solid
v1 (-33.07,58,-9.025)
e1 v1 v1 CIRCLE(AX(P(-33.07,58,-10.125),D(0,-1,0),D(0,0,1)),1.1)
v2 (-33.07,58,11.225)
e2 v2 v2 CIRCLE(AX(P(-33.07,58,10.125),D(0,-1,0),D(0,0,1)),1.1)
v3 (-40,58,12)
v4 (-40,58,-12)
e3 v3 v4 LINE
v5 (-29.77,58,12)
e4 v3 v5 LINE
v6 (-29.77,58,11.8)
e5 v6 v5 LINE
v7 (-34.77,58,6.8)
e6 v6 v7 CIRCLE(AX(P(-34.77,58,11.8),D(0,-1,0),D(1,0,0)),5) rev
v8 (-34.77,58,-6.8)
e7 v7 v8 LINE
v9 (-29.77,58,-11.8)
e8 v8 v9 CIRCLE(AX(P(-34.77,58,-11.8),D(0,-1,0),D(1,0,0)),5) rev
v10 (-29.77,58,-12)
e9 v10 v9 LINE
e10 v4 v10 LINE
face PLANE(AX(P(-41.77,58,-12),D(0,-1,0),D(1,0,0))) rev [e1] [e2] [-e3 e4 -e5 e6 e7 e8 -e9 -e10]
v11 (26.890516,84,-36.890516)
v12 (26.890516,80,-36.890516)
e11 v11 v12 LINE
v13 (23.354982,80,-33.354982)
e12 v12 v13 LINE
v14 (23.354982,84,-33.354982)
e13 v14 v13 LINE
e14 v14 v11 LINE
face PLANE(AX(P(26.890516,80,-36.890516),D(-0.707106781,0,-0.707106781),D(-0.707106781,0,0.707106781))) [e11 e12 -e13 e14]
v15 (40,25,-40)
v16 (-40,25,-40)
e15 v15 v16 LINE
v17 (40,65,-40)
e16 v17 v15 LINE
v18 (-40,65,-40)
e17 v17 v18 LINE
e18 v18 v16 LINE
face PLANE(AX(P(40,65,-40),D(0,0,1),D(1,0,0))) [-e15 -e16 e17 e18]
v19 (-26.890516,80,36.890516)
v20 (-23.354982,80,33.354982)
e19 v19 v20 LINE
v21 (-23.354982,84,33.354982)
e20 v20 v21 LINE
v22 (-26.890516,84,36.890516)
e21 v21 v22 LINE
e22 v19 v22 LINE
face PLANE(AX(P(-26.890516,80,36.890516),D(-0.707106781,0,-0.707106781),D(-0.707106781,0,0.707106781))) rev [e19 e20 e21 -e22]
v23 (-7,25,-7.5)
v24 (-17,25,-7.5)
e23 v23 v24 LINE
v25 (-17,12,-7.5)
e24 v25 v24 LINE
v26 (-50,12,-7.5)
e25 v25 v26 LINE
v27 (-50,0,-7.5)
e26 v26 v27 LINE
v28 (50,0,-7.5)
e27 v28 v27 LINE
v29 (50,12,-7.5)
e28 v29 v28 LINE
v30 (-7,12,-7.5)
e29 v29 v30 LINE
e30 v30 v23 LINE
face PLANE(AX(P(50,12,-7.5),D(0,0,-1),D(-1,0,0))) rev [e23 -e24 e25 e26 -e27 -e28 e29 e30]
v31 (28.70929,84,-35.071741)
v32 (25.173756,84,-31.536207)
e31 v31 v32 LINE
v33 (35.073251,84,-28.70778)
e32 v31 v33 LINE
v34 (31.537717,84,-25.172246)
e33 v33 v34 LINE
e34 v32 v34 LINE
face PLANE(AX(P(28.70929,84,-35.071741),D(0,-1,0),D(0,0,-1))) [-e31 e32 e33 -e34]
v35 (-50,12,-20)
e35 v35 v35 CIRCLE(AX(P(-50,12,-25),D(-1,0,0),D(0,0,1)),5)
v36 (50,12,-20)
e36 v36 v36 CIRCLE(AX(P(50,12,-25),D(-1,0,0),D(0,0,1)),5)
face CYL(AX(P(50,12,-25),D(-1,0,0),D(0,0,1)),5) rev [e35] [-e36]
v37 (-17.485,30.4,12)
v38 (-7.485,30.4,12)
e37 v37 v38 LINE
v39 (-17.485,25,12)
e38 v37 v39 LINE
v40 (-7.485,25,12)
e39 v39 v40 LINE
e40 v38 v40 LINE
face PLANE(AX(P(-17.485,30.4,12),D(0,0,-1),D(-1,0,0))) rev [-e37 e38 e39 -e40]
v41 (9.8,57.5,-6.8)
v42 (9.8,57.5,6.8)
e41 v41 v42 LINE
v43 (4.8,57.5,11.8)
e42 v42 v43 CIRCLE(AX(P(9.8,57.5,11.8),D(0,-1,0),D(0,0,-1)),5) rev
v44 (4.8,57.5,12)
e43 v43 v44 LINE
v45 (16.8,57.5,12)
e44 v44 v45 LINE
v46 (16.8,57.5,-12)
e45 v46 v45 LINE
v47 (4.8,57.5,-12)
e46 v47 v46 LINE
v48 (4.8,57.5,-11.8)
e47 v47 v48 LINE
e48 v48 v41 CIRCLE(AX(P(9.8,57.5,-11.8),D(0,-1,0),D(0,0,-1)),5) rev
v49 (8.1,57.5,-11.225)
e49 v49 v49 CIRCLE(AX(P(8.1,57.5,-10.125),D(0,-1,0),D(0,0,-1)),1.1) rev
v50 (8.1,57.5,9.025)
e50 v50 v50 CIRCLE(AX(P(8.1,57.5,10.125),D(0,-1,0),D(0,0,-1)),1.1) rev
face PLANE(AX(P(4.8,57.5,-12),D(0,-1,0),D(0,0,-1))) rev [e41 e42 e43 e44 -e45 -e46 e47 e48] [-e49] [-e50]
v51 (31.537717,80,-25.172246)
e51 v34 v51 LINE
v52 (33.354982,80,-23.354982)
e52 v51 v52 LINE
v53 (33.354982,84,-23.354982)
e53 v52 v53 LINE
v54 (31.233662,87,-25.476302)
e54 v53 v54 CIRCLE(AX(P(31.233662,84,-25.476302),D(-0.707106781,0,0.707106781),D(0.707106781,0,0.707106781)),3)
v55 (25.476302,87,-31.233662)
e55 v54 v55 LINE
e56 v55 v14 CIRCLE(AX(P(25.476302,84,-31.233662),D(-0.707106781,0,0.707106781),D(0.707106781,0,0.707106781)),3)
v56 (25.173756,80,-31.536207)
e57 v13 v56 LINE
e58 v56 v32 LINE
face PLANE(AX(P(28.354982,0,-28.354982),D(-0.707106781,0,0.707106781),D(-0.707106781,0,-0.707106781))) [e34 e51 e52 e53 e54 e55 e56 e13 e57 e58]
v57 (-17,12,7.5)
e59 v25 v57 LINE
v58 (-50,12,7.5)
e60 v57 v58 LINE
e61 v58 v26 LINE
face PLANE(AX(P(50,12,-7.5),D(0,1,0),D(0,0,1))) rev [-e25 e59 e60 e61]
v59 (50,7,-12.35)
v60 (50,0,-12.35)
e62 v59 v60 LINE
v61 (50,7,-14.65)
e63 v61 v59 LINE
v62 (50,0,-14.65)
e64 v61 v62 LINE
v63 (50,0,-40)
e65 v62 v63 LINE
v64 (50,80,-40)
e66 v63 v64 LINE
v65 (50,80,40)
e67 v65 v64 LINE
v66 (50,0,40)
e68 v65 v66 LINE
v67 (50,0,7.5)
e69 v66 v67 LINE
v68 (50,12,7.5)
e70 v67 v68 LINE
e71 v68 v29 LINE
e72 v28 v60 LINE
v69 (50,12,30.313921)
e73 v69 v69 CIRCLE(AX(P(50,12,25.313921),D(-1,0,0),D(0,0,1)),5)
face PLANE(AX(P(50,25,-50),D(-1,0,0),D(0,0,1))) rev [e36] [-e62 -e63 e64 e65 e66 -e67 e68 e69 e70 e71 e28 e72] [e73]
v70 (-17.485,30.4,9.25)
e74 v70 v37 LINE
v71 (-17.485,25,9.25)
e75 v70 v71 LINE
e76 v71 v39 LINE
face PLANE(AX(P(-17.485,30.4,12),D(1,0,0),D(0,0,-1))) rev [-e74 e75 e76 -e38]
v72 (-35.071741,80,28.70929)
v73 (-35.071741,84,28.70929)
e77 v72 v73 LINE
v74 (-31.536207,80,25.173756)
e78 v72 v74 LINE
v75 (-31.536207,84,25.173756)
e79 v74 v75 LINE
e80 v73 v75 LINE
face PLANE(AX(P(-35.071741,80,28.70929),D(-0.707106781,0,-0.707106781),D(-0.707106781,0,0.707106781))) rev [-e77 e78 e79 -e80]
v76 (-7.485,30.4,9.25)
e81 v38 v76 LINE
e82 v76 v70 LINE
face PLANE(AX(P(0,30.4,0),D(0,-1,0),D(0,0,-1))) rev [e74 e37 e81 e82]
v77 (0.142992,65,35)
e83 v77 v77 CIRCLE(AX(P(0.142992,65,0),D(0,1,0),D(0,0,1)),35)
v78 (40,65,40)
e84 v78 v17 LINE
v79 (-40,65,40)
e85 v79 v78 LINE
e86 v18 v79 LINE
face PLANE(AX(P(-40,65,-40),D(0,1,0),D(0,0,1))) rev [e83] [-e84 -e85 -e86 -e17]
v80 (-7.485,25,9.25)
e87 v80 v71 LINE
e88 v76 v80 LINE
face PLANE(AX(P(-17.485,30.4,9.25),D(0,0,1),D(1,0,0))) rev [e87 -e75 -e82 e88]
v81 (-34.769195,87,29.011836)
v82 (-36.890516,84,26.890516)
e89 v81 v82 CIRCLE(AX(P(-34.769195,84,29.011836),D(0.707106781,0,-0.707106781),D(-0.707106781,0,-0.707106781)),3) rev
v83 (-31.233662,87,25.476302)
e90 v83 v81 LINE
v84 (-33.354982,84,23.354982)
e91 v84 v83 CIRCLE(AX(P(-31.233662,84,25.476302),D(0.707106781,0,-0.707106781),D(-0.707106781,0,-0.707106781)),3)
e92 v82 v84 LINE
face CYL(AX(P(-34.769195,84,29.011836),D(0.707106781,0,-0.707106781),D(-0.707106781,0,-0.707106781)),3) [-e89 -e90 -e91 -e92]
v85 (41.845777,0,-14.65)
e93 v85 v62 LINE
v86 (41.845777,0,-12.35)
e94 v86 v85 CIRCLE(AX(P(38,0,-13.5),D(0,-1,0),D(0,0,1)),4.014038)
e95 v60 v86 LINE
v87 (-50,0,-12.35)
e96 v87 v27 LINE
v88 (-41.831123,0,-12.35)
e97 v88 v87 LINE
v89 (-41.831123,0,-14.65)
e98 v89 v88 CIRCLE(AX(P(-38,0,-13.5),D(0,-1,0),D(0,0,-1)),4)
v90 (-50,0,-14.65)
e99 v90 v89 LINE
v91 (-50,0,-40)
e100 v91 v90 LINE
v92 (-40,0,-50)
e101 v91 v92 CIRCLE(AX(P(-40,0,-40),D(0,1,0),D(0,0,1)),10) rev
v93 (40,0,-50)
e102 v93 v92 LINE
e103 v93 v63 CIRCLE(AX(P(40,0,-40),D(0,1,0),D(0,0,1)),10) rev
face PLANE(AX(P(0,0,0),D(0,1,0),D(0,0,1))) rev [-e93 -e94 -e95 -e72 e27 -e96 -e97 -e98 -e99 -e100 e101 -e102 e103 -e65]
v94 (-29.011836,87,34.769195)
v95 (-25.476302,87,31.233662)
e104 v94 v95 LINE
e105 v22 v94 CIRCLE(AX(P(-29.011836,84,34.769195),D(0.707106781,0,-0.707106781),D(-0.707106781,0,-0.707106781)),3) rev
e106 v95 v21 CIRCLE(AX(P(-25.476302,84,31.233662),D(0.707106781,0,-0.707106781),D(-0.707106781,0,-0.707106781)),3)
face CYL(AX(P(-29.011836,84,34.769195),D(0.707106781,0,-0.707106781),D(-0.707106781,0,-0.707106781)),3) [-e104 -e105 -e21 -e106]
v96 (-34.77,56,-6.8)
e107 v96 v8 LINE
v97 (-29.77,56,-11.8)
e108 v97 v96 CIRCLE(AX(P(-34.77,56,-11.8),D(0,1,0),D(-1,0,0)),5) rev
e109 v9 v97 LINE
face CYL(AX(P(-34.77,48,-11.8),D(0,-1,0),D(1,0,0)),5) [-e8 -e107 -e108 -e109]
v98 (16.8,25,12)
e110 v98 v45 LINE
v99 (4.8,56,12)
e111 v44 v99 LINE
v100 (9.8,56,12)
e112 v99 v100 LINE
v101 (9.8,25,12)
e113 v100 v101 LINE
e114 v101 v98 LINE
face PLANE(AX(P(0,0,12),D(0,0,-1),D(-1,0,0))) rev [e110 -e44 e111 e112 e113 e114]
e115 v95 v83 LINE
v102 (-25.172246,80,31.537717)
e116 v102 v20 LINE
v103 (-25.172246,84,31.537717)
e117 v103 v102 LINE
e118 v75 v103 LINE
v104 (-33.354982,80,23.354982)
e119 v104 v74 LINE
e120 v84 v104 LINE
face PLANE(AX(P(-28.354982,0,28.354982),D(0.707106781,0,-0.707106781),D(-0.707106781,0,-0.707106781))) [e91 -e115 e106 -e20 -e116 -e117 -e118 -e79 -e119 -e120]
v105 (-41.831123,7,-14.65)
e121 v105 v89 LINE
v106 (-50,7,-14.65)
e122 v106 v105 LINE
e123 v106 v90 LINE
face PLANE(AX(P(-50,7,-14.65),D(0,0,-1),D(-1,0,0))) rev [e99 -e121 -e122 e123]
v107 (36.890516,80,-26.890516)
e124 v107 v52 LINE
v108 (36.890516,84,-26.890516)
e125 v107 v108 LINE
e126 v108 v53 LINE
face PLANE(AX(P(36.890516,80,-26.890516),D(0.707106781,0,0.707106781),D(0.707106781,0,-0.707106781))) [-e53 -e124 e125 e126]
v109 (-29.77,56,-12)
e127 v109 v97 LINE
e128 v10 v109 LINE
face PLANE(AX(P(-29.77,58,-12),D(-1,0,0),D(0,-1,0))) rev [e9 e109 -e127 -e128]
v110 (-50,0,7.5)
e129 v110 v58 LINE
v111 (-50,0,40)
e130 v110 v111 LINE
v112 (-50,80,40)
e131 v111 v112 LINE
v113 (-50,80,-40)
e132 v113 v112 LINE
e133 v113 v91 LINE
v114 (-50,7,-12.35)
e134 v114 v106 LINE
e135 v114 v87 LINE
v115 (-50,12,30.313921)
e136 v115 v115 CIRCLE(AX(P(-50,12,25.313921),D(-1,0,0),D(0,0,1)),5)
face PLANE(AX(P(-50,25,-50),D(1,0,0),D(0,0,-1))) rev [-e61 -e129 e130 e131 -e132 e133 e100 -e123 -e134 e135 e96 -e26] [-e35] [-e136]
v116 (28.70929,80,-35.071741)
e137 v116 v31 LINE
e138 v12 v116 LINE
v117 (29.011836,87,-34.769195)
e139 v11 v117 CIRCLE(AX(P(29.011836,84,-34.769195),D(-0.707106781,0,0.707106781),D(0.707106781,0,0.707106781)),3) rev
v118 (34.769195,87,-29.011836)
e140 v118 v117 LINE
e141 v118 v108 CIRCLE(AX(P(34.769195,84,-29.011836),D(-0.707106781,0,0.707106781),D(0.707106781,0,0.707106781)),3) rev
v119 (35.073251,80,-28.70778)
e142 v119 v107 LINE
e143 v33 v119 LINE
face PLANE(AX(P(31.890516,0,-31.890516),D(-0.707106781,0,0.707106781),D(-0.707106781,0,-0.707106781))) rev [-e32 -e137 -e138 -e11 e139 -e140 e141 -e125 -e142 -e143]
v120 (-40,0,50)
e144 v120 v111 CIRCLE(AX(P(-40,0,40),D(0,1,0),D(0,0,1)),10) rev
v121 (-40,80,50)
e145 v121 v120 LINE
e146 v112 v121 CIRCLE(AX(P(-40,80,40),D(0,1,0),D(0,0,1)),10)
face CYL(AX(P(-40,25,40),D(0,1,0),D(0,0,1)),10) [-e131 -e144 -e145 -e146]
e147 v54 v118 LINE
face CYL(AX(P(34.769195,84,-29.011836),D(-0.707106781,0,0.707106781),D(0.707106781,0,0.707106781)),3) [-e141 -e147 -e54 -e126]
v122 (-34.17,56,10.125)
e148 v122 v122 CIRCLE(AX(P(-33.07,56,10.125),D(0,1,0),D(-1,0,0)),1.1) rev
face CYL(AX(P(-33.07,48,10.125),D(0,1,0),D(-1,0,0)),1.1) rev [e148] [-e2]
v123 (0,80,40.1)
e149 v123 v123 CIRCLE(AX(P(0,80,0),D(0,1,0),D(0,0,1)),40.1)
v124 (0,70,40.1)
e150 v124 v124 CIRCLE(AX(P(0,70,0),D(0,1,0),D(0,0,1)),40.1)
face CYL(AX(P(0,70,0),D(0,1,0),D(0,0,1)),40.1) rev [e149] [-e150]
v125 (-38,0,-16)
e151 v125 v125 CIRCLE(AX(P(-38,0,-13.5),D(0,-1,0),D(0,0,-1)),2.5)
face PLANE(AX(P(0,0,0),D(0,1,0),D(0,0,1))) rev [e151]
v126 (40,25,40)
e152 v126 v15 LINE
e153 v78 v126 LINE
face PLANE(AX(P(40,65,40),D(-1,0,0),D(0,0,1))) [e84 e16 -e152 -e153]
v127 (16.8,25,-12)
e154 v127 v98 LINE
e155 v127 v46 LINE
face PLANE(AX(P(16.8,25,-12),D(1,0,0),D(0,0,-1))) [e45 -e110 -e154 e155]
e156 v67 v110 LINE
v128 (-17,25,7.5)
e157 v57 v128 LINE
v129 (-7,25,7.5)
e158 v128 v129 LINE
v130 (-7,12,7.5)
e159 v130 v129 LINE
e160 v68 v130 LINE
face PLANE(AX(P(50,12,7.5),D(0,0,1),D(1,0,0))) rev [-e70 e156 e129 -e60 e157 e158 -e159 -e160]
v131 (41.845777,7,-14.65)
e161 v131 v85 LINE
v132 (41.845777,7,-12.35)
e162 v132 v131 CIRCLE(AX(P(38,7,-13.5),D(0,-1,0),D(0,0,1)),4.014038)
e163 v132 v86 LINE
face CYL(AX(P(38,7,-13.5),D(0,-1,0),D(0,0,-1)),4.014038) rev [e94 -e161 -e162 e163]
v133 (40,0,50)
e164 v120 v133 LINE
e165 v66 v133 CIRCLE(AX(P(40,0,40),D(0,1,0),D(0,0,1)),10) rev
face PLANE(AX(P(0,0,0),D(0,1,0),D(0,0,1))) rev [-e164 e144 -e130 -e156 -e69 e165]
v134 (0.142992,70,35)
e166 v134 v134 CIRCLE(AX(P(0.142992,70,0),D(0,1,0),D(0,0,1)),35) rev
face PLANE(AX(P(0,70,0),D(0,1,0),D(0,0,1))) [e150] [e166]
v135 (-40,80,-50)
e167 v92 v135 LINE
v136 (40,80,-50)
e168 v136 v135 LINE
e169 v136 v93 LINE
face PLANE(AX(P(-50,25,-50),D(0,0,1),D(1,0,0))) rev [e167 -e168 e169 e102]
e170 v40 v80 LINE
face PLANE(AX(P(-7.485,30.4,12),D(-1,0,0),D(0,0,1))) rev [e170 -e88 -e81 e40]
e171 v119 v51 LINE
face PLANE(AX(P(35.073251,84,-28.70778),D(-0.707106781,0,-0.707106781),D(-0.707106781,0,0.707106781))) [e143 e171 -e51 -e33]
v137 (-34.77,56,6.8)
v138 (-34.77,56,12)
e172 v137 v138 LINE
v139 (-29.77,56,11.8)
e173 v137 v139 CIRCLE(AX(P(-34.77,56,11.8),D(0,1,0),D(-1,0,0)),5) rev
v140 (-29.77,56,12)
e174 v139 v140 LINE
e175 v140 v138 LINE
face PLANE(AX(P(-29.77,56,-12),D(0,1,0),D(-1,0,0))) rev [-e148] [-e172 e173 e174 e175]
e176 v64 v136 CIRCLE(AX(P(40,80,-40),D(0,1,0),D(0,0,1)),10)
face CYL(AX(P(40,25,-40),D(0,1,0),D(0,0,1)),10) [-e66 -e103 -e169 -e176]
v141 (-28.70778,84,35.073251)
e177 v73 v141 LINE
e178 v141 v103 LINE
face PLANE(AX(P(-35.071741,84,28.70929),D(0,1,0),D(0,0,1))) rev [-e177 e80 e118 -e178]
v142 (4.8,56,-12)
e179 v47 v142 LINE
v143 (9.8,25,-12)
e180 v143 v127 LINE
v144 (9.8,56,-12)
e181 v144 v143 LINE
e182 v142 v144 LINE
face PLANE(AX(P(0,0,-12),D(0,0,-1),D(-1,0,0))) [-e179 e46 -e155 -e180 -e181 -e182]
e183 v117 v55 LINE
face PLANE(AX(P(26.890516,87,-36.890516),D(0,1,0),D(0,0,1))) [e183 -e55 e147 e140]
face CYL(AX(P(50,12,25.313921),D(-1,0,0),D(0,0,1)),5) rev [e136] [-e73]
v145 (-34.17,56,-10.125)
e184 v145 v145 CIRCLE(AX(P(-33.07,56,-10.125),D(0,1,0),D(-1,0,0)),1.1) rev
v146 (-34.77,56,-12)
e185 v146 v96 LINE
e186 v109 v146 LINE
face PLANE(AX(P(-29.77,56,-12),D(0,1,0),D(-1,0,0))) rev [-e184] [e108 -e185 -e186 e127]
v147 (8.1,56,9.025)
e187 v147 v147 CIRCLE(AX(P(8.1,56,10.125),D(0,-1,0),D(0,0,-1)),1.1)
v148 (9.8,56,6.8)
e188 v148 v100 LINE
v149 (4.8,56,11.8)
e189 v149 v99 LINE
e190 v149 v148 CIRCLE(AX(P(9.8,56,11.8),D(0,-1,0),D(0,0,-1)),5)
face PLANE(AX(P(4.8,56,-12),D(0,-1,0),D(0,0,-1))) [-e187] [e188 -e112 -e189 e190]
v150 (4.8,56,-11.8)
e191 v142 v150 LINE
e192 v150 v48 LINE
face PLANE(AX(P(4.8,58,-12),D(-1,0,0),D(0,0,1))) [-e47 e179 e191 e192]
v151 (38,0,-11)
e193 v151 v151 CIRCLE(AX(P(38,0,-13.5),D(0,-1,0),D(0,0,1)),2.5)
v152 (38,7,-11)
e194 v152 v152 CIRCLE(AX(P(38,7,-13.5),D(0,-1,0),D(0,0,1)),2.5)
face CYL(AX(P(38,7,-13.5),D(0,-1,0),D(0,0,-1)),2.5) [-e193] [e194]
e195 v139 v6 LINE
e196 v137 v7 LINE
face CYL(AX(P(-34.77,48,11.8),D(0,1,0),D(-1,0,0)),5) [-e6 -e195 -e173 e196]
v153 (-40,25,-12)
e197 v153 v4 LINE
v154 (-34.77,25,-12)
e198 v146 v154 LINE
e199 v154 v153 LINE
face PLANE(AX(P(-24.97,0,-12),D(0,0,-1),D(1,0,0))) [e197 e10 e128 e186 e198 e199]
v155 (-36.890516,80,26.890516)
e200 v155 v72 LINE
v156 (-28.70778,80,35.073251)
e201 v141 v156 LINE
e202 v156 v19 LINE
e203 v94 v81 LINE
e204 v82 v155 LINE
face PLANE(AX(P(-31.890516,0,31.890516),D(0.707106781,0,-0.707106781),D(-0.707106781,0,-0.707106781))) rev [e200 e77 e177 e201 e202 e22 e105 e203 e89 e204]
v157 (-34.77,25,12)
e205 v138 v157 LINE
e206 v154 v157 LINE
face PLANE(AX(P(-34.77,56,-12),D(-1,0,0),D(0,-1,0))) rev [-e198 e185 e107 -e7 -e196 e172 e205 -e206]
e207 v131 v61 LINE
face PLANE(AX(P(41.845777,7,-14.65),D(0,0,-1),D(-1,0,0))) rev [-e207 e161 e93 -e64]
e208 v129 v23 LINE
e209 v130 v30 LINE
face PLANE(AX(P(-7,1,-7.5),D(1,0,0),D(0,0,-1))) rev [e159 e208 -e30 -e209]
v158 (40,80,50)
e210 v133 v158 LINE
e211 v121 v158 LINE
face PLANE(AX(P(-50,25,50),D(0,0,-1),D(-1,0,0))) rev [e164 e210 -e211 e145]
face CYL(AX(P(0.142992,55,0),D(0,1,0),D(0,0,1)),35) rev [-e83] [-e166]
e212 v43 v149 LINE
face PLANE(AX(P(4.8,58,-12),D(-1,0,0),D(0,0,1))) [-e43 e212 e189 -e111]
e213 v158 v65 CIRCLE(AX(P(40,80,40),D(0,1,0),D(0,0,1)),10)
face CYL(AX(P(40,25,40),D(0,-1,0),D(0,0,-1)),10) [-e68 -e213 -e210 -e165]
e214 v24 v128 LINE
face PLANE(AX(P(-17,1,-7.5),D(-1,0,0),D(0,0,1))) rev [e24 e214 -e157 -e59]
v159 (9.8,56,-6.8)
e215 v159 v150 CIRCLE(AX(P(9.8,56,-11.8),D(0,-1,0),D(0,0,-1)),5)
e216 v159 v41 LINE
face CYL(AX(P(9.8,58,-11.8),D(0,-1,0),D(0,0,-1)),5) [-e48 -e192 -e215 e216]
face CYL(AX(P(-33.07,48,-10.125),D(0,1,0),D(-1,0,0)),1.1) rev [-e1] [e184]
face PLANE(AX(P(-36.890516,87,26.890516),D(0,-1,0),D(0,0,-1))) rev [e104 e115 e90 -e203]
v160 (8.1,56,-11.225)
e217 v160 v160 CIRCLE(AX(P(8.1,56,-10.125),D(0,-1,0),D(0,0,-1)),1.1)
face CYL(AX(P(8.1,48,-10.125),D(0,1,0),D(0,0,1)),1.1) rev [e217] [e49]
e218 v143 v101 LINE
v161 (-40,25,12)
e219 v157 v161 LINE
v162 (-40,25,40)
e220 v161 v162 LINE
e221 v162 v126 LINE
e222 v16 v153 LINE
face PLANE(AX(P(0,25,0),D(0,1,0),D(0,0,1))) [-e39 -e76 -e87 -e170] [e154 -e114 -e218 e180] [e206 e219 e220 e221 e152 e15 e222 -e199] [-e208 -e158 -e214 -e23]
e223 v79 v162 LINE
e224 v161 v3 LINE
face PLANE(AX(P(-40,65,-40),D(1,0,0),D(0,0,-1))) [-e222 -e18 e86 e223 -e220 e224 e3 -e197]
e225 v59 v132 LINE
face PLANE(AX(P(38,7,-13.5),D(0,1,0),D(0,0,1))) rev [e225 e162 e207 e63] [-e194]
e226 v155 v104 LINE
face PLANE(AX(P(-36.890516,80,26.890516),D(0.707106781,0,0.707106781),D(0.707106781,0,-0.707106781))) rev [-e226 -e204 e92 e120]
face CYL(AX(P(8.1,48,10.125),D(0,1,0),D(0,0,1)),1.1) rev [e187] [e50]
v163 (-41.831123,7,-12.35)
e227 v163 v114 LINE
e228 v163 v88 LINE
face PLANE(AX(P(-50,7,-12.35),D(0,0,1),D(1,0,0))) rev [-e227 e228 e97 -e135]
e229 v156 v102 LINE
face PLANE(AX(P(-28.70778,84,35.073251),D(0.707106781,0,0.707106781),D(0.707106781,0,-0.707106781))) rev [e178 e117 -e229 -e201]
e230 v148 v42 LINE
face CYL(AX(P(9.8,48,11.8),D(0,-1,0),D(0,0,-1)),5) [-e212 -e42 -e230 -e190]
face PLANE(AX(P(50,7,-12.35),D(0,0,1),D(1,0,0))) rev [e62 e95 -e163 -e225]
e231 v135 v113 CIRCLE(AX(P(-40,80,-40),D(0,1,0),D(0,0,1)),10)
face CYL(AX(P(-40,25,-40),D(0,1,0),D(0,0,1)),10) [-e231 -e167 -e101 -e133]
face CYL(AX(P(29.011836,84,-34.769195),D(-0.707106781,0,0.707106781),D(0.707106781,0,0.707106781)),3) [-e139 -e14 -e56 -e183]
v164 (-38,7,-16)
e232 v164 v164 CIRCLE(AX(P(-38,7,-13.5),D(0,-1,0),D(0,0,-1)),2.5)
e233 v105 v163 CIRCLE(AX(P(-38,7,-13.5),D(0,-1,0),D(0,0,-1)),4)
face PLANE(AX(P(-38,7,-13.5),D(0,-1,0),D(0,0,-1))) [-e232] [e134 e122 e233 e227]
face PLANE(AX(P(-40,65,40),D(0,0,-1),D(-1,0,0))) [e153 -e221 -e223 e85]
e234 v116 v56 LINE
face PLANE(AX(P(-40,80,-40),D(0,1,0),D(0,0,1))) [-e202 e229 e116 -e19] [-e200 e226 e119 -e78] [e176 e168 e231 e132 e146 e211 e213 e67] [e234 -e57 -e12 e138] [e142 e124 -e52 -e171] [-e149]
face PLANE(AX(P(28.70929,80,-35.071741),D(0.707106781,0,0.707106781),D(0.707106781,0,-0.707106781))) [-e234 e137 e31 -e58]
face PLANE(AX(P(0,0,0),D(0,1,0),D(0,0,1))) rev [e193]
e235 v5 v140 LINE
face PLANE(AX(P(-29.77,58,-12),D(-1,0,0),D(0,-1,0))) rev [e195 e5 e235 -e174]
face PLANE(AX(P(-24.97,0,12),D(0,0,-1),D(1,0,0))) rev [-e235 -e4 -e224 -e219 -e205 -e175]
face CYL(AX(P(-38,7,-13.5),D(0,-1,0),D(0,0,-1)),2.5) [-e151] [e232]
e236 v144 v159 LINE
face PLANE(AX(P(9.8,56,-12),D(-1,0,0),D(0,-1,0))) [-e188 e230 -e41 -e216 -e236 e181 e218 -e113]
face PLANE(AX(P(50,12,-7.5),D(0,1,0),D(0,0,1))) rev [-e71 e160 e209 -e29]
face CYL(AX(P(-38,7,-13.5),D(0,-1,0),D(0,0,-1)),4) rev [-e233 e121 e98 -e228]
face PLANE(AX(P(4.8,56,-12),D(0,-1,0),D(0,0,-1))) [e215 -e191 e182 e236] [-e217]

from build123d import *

# Parameters (mm, degrees)
SKETCH1_W            = 100
SKETCH1_H            = 100
BOSS_EXTRUDE1_DEPTH  = 25
SKETCH2_W            = 100
SKETCH2_H            = 100
SKETCH2_W_2          = 80
SKETCH2_H_2          = 80
BOSS_EXTRUDE2_DEPTH  = 40
SKETCH3_R            = 5
SKETCH3_W            = 15
SKETCH3_H            = 12
CUT_EXTRUDE1_DEPTH   = 130.325171564
FILLET2_R            = 10
FILLET3_R            = 10
FILLET4_R            = 10
FILLET5_R            = 10
BOSS_EXTRUDE3_DEPTH  = 15
SKETCH6_R            = 35
CUT_EXTRUDE3_DEPTH   = 25
SKETCH7_R            = 40.1
CUT_EXTRUDE4_DEPTH   = 10
BOSS_EXTRUDE4_DEPTH  = 12
SKETCH10_R           = 1.1
SKETCH10_W           = 5
SKETCH10_H           = 13.6
CUT_EXTRUDE5_DEPTH   = 10
FILLET6_R            = 5
SKETCH11_W           = 12
SKETCH11_H           = 0.5
CUT_EXTRUDE6_DEPTH   = 24
SKETCH12_W           = 10
SKETCH12_H           = 15
CUT_EXTRUDE7_DEPTH   = 24
SKETCH15_W           = 10
SKETCH15_H           = 2.75
BOSS_EXTRUDE5_DEPTH  = 5.4
SKETCH18_R           = 2.5
CUT_EXTRUDE8_DEPTH   = 7
BOSS_EXTRUDE6_DEPTH  = 5
FILLET8_R            = 3
FILLET8_OF_MIRROR3_R = 3


with BuildPart() as part:
    # Sketch1 → Boss-Extrude1 (new body)
    with BuildSketch(Plane(origin=(0, 0, 0), x_dir=(1, 0, 0), z_dir=(0, 1, 0))):
        Rectangle(SKETCH1_W, SKETCH1_H)
    extrude(amount=BOSS_EXTRUDE1_DEPTH)

    # Sketch2 → Boss-Extrude2 (add)
    with BuildSketch(Plane(origin=(0, 25, 0), x_dir=(1, 0, 0), z_dir=(0, 1, 0))):
        Rectangle(SKETCH2_W, SKETCH2_H)
        Rectangle(SKETCH2_W_2, SKETCH2_H_2, mode=Mode.SUBTRACT)
    extrude(amount=BOSS_EXTRUDE2_DEPTH)

    # Sketch3 → Cut-Extrude1 (cut, through all)
    with BuildSketch(Plane.ZY.offset(50)):
        with Locations((-25, 12)):
            Circle(SKETCH3_R)
        with Locations((25.313920598, 12)):
            Circle(SKETCH3_R)
        with Locations((0, 6)):
            Rectangle(SKETCH3_W, SKETCH3_H)
    extrude(amount=-CUT_EXTRUDE1_DEPTH, mode=Mode.SUBTRACT)

    # Fillet2
    fillet2_edges = [part.edges().sort_by_distance(p)[0] for p in [
        (50, 32.5, 50),
    ]]
    fillet(fillet2_edges, radius=FILLET2_R)

    # Fillet3
    fillet3_edges = [part.edges().sort_by_distance(p)[0] for p in [
        (50, 32.5, -50),
    ]]
    fillet(fillet3_edges, radius=FILLET3_R)

    # Fillet4
    fillet4_edges = [part.edges().sort_by_distance(p)[0] for p in [
        (-50, 32.5, -50),
    ]]
    fillet(fillet4_edges, radius=FILLET4_R)

    # Fillet5
    fillet5_edges = [part.edges().sort_by_distance(p)[0] for p in [
        (-50, 32.5, 50),
    ]]
    fillet(fillet5_edges, radius=FILLET5_R)

    # Sketch5 → Boss-Extrude3 (add)
    with BuildSketch(Plane(origin=(0, 65, 0), x_dir=(1, 0, 0), z_dir=(0, 1, 0))):
        with BuildLine():
            Line((-50, 40), (-50, -40))
            ThreePointArc((-50, -40), (-47.071067812, -47.071067812), (-40, -50))
            Line((-40, -50), (40, -50))
            ThreePointArc((40, -50), (47.071067812, -47.071067812), (50, -40))
            Line((50, -40), (50, 40))
            ThreePointArc((50, 40), (47.071067812, 47.071067812), (40, 50))
            Line((40, 50), (-40, 50))
            ThreePointArc((-40, 50), (-47.071067812, 47.071067812), (-50, 40))
        make_face()
    extrude(amount=BOSS_EXTRUDE3_DEPTH)

    # Sketch6 → Cut-Extrude3 (cut)
    with BuildSketch(Plane(origin=(0, 80, 0), x_dir=(1, 0, 0), z_dir=(0, 1, 0))):
        with Locations(Location((0.142992369, 0, 0), (0, 0, 270))):
            Circle(SKETCH6_R)
    extrude(amount=-CUT_EXTRUDE3_DEPTH, mode=Mode.SUBTRACT)

    # Sketch7 → Cut-Extrude4 (cut)
    with BuildSketch(Plane(origin=(0, 80, 0), x_dir=(1, 0, 0), z_dir=(0, 1, 0))):
        with Locations(Location((0, 0, 0), (0, 0, 270))):
            Circle(SKETCH7_R)
    extrude(amount=-CUT_EXTRUDE4_DEPTH, mode=Mode.SUBTRACT)

    # Sketch9 → Boss-Extrude4 (add, symmetric)
    with BuildSketch(Plane.XY):
        Polygon((9.8, 56), (9.8, 25), (16.8, 25), (16.8, 58), (4.8, 58), (4.8, 56), align=None)
    boss_extrude4 = extrude(amount=BOSS_EXTRUDE4_DEPTH, both=True)

    # Mirror1: Boss-Extrude4 across plane
    add(boss_extrude4.mirror(Plane.ZY.offset(12.485)))

    # Sketch10 → Cut-Extrude5 (cut)
    with BuildSketch(Plane(origin=(0, 58, 0), x_dir=(1, 0, 0), z_dir=(0, 1, 0))):
        with Locations(Location((8.1, -10.125, 0), (0, 0, 270))):
            Circle(SKETCH10_R)
        with Locations(Location((8.1, 10.125, 0), (0, 0, 270))):
            Circle(SKETCH10_R)
        with Locations((7.3, 0)):
            Rectangle(SKETCH10_W, SKETCH10_H)
    cut_extrude5 = extrude(amount=-CUT_EXTRUDE5_DEPTH, mode=Mode.SUBTRACT)

    # Mirror2: Cut-Extrude5 across plane
    add(cut_extrude5.mirror(Plane.ZY.offset(12.485)), mode=Mode.SUBTRACT)

    # Fillet6
    fillet6_edges = [part.edges().sort_by_distance(p)[0] for p in [
        (-29.77, 57, 6.8),
        (-29.77, 57, -6.8),
        (4.8, 57, 6.8),
        (4.8, 57, -6.8),
    ]]
    fillet(fillet6_edges, radius=FILLET6_R - 0.0001)  # a hair under: the kernel refuses the full size

    # Sketch11 → Cut-Extrude6 (cut)
    with BuildSketch(Plane.XY.offset(12)):
        with Locations((10.8, 57.75)):
            Rectangle(SKETCH11_W, SKETCH11_H)
    extrude(amount=-CUT_EXTRUDE6_DEPTH, mode=Mode.SUBTRACT)

    # Sketch12 → Cut-Extrude7 (cut)
    with BuildSketch(Plane(origin=(0, 25, 0), x_dir=(1, 0, 0), z_dir=(0, 1, 0))):
        with Locations((-12, 0)):
            Rectangle(SKETCH12_W, SKETCH12_H)
    extrude(amount=-CUT_EXTRUDE7_DEPTH, mode=Mode.SUBTRACT)

    # Sketch15 → Boss-Extrude5 (add)
    with BuildSketch(Plane(origin=(0, 25, 0), x_dir=(1, 0, 0), z_dir=(0, 1, 0))):
        with Locations((-12.485, -10.625)):
            Rectangle(SKETCH15_W, SKETCH15_H)
    extrude(amount=BOSS_EXTRUDE5_DEPTH)

    # Sketch18 → Cut-Extrude8 (cut)
    # profile 1 of 2: a face of its own
    with BuildSketch(Plane.XZ):
        with BuildLine():
            Line((-50, -12.35), (-50, -14.65))
            Line((-50, -14.65), (-41.831122551, -14.65))
            ThreePointArc((-41.831122551, -14.65), (-34, -13.5), (-41.831122551, -12.35))
            Line((-41.831122551, -12.35), (-50, -12.35))
        make_face()
        with Locations(Location((-38, -13.5, 0), (0, 0, 270))):
            Circle(SKETCH18_R, mode=Mode.SUBTRACT)
    # profile 2 of 2: a face of its own
    with BuildSketch(Plane.XZ):
        with BuildLine():
            Line((41.845776905, -14.65), (50, -14.65))
            Line((50, -14.65), (50, -12.35))
            Line((50, -12.35), (41.845776905, -12.35))
            ThreePointArc((41.845776905, -12.35), (33.985962133, -13.5), (41.845776905, -14.65))
        make_face()
        with Locations(Location((38, -13.5, 0), (0, 0, 90))):
            Circle(SKETCH18_R, mode=Mode.SUBTRACT)
    extrude(amount=-CUT_EXTRUDE8_DEPTH, mode=Mode.SUBTRACT)

    # Sketch20 → Boss-Extrude6 (add)
    with BuildSketch(Plane(origin=(-28.354981926, 0, 28.354981926), x_dir=(0.7071067811865476, 0, 0.7071067811865475), z_dir=(-0.7071067811865475, 0, 0.7071067811865476))):
        Polygon((-4.498932188, 80), (-4.498932188, 84), (4.501067812, 84), (4.501067812, 80), (7.071067812, 80), (7.071067812, 87), (-7.071067812, 87), (-7.071067812, 80), align=None)
    boss_extrude6 = extrude(amount=BOSS_EXTRUDE6_DEPTH)

    # Fillet8
    fillet8_edges = [part.edges().sort_by_distance(p)[0] for p in [
        (-35.122748879, 87, 25.122748879),
        (-25.122748879, 87, 35.122748879),
    ]]
    fillet(fillet8_edges, radius=FILLET8_R)

    # Mirror3: Boss-Extrude6 across plane
    add(boss_extrude6.mirror(Plane(origin=(0, 0, 0), x_dir=(0.7071067811865476, 0, 0.7071067811865475), z_dir=(-0.7071067811865475, 0, 0.7071067811865476))))

    # Fillet8 of Mirror3
    fillet8_of_mirror3_edges = [part.edges().sort_by_distance(p)[0] for p in [
        (25.122748879, 87, -35.122748879),
        (35.122748879, 87, -25.122748879),
    ]]
    fillet(fillet8_of_mirror3_edges, radius=FILLET8_OF_MIRROR3_R)


solid = part.part
